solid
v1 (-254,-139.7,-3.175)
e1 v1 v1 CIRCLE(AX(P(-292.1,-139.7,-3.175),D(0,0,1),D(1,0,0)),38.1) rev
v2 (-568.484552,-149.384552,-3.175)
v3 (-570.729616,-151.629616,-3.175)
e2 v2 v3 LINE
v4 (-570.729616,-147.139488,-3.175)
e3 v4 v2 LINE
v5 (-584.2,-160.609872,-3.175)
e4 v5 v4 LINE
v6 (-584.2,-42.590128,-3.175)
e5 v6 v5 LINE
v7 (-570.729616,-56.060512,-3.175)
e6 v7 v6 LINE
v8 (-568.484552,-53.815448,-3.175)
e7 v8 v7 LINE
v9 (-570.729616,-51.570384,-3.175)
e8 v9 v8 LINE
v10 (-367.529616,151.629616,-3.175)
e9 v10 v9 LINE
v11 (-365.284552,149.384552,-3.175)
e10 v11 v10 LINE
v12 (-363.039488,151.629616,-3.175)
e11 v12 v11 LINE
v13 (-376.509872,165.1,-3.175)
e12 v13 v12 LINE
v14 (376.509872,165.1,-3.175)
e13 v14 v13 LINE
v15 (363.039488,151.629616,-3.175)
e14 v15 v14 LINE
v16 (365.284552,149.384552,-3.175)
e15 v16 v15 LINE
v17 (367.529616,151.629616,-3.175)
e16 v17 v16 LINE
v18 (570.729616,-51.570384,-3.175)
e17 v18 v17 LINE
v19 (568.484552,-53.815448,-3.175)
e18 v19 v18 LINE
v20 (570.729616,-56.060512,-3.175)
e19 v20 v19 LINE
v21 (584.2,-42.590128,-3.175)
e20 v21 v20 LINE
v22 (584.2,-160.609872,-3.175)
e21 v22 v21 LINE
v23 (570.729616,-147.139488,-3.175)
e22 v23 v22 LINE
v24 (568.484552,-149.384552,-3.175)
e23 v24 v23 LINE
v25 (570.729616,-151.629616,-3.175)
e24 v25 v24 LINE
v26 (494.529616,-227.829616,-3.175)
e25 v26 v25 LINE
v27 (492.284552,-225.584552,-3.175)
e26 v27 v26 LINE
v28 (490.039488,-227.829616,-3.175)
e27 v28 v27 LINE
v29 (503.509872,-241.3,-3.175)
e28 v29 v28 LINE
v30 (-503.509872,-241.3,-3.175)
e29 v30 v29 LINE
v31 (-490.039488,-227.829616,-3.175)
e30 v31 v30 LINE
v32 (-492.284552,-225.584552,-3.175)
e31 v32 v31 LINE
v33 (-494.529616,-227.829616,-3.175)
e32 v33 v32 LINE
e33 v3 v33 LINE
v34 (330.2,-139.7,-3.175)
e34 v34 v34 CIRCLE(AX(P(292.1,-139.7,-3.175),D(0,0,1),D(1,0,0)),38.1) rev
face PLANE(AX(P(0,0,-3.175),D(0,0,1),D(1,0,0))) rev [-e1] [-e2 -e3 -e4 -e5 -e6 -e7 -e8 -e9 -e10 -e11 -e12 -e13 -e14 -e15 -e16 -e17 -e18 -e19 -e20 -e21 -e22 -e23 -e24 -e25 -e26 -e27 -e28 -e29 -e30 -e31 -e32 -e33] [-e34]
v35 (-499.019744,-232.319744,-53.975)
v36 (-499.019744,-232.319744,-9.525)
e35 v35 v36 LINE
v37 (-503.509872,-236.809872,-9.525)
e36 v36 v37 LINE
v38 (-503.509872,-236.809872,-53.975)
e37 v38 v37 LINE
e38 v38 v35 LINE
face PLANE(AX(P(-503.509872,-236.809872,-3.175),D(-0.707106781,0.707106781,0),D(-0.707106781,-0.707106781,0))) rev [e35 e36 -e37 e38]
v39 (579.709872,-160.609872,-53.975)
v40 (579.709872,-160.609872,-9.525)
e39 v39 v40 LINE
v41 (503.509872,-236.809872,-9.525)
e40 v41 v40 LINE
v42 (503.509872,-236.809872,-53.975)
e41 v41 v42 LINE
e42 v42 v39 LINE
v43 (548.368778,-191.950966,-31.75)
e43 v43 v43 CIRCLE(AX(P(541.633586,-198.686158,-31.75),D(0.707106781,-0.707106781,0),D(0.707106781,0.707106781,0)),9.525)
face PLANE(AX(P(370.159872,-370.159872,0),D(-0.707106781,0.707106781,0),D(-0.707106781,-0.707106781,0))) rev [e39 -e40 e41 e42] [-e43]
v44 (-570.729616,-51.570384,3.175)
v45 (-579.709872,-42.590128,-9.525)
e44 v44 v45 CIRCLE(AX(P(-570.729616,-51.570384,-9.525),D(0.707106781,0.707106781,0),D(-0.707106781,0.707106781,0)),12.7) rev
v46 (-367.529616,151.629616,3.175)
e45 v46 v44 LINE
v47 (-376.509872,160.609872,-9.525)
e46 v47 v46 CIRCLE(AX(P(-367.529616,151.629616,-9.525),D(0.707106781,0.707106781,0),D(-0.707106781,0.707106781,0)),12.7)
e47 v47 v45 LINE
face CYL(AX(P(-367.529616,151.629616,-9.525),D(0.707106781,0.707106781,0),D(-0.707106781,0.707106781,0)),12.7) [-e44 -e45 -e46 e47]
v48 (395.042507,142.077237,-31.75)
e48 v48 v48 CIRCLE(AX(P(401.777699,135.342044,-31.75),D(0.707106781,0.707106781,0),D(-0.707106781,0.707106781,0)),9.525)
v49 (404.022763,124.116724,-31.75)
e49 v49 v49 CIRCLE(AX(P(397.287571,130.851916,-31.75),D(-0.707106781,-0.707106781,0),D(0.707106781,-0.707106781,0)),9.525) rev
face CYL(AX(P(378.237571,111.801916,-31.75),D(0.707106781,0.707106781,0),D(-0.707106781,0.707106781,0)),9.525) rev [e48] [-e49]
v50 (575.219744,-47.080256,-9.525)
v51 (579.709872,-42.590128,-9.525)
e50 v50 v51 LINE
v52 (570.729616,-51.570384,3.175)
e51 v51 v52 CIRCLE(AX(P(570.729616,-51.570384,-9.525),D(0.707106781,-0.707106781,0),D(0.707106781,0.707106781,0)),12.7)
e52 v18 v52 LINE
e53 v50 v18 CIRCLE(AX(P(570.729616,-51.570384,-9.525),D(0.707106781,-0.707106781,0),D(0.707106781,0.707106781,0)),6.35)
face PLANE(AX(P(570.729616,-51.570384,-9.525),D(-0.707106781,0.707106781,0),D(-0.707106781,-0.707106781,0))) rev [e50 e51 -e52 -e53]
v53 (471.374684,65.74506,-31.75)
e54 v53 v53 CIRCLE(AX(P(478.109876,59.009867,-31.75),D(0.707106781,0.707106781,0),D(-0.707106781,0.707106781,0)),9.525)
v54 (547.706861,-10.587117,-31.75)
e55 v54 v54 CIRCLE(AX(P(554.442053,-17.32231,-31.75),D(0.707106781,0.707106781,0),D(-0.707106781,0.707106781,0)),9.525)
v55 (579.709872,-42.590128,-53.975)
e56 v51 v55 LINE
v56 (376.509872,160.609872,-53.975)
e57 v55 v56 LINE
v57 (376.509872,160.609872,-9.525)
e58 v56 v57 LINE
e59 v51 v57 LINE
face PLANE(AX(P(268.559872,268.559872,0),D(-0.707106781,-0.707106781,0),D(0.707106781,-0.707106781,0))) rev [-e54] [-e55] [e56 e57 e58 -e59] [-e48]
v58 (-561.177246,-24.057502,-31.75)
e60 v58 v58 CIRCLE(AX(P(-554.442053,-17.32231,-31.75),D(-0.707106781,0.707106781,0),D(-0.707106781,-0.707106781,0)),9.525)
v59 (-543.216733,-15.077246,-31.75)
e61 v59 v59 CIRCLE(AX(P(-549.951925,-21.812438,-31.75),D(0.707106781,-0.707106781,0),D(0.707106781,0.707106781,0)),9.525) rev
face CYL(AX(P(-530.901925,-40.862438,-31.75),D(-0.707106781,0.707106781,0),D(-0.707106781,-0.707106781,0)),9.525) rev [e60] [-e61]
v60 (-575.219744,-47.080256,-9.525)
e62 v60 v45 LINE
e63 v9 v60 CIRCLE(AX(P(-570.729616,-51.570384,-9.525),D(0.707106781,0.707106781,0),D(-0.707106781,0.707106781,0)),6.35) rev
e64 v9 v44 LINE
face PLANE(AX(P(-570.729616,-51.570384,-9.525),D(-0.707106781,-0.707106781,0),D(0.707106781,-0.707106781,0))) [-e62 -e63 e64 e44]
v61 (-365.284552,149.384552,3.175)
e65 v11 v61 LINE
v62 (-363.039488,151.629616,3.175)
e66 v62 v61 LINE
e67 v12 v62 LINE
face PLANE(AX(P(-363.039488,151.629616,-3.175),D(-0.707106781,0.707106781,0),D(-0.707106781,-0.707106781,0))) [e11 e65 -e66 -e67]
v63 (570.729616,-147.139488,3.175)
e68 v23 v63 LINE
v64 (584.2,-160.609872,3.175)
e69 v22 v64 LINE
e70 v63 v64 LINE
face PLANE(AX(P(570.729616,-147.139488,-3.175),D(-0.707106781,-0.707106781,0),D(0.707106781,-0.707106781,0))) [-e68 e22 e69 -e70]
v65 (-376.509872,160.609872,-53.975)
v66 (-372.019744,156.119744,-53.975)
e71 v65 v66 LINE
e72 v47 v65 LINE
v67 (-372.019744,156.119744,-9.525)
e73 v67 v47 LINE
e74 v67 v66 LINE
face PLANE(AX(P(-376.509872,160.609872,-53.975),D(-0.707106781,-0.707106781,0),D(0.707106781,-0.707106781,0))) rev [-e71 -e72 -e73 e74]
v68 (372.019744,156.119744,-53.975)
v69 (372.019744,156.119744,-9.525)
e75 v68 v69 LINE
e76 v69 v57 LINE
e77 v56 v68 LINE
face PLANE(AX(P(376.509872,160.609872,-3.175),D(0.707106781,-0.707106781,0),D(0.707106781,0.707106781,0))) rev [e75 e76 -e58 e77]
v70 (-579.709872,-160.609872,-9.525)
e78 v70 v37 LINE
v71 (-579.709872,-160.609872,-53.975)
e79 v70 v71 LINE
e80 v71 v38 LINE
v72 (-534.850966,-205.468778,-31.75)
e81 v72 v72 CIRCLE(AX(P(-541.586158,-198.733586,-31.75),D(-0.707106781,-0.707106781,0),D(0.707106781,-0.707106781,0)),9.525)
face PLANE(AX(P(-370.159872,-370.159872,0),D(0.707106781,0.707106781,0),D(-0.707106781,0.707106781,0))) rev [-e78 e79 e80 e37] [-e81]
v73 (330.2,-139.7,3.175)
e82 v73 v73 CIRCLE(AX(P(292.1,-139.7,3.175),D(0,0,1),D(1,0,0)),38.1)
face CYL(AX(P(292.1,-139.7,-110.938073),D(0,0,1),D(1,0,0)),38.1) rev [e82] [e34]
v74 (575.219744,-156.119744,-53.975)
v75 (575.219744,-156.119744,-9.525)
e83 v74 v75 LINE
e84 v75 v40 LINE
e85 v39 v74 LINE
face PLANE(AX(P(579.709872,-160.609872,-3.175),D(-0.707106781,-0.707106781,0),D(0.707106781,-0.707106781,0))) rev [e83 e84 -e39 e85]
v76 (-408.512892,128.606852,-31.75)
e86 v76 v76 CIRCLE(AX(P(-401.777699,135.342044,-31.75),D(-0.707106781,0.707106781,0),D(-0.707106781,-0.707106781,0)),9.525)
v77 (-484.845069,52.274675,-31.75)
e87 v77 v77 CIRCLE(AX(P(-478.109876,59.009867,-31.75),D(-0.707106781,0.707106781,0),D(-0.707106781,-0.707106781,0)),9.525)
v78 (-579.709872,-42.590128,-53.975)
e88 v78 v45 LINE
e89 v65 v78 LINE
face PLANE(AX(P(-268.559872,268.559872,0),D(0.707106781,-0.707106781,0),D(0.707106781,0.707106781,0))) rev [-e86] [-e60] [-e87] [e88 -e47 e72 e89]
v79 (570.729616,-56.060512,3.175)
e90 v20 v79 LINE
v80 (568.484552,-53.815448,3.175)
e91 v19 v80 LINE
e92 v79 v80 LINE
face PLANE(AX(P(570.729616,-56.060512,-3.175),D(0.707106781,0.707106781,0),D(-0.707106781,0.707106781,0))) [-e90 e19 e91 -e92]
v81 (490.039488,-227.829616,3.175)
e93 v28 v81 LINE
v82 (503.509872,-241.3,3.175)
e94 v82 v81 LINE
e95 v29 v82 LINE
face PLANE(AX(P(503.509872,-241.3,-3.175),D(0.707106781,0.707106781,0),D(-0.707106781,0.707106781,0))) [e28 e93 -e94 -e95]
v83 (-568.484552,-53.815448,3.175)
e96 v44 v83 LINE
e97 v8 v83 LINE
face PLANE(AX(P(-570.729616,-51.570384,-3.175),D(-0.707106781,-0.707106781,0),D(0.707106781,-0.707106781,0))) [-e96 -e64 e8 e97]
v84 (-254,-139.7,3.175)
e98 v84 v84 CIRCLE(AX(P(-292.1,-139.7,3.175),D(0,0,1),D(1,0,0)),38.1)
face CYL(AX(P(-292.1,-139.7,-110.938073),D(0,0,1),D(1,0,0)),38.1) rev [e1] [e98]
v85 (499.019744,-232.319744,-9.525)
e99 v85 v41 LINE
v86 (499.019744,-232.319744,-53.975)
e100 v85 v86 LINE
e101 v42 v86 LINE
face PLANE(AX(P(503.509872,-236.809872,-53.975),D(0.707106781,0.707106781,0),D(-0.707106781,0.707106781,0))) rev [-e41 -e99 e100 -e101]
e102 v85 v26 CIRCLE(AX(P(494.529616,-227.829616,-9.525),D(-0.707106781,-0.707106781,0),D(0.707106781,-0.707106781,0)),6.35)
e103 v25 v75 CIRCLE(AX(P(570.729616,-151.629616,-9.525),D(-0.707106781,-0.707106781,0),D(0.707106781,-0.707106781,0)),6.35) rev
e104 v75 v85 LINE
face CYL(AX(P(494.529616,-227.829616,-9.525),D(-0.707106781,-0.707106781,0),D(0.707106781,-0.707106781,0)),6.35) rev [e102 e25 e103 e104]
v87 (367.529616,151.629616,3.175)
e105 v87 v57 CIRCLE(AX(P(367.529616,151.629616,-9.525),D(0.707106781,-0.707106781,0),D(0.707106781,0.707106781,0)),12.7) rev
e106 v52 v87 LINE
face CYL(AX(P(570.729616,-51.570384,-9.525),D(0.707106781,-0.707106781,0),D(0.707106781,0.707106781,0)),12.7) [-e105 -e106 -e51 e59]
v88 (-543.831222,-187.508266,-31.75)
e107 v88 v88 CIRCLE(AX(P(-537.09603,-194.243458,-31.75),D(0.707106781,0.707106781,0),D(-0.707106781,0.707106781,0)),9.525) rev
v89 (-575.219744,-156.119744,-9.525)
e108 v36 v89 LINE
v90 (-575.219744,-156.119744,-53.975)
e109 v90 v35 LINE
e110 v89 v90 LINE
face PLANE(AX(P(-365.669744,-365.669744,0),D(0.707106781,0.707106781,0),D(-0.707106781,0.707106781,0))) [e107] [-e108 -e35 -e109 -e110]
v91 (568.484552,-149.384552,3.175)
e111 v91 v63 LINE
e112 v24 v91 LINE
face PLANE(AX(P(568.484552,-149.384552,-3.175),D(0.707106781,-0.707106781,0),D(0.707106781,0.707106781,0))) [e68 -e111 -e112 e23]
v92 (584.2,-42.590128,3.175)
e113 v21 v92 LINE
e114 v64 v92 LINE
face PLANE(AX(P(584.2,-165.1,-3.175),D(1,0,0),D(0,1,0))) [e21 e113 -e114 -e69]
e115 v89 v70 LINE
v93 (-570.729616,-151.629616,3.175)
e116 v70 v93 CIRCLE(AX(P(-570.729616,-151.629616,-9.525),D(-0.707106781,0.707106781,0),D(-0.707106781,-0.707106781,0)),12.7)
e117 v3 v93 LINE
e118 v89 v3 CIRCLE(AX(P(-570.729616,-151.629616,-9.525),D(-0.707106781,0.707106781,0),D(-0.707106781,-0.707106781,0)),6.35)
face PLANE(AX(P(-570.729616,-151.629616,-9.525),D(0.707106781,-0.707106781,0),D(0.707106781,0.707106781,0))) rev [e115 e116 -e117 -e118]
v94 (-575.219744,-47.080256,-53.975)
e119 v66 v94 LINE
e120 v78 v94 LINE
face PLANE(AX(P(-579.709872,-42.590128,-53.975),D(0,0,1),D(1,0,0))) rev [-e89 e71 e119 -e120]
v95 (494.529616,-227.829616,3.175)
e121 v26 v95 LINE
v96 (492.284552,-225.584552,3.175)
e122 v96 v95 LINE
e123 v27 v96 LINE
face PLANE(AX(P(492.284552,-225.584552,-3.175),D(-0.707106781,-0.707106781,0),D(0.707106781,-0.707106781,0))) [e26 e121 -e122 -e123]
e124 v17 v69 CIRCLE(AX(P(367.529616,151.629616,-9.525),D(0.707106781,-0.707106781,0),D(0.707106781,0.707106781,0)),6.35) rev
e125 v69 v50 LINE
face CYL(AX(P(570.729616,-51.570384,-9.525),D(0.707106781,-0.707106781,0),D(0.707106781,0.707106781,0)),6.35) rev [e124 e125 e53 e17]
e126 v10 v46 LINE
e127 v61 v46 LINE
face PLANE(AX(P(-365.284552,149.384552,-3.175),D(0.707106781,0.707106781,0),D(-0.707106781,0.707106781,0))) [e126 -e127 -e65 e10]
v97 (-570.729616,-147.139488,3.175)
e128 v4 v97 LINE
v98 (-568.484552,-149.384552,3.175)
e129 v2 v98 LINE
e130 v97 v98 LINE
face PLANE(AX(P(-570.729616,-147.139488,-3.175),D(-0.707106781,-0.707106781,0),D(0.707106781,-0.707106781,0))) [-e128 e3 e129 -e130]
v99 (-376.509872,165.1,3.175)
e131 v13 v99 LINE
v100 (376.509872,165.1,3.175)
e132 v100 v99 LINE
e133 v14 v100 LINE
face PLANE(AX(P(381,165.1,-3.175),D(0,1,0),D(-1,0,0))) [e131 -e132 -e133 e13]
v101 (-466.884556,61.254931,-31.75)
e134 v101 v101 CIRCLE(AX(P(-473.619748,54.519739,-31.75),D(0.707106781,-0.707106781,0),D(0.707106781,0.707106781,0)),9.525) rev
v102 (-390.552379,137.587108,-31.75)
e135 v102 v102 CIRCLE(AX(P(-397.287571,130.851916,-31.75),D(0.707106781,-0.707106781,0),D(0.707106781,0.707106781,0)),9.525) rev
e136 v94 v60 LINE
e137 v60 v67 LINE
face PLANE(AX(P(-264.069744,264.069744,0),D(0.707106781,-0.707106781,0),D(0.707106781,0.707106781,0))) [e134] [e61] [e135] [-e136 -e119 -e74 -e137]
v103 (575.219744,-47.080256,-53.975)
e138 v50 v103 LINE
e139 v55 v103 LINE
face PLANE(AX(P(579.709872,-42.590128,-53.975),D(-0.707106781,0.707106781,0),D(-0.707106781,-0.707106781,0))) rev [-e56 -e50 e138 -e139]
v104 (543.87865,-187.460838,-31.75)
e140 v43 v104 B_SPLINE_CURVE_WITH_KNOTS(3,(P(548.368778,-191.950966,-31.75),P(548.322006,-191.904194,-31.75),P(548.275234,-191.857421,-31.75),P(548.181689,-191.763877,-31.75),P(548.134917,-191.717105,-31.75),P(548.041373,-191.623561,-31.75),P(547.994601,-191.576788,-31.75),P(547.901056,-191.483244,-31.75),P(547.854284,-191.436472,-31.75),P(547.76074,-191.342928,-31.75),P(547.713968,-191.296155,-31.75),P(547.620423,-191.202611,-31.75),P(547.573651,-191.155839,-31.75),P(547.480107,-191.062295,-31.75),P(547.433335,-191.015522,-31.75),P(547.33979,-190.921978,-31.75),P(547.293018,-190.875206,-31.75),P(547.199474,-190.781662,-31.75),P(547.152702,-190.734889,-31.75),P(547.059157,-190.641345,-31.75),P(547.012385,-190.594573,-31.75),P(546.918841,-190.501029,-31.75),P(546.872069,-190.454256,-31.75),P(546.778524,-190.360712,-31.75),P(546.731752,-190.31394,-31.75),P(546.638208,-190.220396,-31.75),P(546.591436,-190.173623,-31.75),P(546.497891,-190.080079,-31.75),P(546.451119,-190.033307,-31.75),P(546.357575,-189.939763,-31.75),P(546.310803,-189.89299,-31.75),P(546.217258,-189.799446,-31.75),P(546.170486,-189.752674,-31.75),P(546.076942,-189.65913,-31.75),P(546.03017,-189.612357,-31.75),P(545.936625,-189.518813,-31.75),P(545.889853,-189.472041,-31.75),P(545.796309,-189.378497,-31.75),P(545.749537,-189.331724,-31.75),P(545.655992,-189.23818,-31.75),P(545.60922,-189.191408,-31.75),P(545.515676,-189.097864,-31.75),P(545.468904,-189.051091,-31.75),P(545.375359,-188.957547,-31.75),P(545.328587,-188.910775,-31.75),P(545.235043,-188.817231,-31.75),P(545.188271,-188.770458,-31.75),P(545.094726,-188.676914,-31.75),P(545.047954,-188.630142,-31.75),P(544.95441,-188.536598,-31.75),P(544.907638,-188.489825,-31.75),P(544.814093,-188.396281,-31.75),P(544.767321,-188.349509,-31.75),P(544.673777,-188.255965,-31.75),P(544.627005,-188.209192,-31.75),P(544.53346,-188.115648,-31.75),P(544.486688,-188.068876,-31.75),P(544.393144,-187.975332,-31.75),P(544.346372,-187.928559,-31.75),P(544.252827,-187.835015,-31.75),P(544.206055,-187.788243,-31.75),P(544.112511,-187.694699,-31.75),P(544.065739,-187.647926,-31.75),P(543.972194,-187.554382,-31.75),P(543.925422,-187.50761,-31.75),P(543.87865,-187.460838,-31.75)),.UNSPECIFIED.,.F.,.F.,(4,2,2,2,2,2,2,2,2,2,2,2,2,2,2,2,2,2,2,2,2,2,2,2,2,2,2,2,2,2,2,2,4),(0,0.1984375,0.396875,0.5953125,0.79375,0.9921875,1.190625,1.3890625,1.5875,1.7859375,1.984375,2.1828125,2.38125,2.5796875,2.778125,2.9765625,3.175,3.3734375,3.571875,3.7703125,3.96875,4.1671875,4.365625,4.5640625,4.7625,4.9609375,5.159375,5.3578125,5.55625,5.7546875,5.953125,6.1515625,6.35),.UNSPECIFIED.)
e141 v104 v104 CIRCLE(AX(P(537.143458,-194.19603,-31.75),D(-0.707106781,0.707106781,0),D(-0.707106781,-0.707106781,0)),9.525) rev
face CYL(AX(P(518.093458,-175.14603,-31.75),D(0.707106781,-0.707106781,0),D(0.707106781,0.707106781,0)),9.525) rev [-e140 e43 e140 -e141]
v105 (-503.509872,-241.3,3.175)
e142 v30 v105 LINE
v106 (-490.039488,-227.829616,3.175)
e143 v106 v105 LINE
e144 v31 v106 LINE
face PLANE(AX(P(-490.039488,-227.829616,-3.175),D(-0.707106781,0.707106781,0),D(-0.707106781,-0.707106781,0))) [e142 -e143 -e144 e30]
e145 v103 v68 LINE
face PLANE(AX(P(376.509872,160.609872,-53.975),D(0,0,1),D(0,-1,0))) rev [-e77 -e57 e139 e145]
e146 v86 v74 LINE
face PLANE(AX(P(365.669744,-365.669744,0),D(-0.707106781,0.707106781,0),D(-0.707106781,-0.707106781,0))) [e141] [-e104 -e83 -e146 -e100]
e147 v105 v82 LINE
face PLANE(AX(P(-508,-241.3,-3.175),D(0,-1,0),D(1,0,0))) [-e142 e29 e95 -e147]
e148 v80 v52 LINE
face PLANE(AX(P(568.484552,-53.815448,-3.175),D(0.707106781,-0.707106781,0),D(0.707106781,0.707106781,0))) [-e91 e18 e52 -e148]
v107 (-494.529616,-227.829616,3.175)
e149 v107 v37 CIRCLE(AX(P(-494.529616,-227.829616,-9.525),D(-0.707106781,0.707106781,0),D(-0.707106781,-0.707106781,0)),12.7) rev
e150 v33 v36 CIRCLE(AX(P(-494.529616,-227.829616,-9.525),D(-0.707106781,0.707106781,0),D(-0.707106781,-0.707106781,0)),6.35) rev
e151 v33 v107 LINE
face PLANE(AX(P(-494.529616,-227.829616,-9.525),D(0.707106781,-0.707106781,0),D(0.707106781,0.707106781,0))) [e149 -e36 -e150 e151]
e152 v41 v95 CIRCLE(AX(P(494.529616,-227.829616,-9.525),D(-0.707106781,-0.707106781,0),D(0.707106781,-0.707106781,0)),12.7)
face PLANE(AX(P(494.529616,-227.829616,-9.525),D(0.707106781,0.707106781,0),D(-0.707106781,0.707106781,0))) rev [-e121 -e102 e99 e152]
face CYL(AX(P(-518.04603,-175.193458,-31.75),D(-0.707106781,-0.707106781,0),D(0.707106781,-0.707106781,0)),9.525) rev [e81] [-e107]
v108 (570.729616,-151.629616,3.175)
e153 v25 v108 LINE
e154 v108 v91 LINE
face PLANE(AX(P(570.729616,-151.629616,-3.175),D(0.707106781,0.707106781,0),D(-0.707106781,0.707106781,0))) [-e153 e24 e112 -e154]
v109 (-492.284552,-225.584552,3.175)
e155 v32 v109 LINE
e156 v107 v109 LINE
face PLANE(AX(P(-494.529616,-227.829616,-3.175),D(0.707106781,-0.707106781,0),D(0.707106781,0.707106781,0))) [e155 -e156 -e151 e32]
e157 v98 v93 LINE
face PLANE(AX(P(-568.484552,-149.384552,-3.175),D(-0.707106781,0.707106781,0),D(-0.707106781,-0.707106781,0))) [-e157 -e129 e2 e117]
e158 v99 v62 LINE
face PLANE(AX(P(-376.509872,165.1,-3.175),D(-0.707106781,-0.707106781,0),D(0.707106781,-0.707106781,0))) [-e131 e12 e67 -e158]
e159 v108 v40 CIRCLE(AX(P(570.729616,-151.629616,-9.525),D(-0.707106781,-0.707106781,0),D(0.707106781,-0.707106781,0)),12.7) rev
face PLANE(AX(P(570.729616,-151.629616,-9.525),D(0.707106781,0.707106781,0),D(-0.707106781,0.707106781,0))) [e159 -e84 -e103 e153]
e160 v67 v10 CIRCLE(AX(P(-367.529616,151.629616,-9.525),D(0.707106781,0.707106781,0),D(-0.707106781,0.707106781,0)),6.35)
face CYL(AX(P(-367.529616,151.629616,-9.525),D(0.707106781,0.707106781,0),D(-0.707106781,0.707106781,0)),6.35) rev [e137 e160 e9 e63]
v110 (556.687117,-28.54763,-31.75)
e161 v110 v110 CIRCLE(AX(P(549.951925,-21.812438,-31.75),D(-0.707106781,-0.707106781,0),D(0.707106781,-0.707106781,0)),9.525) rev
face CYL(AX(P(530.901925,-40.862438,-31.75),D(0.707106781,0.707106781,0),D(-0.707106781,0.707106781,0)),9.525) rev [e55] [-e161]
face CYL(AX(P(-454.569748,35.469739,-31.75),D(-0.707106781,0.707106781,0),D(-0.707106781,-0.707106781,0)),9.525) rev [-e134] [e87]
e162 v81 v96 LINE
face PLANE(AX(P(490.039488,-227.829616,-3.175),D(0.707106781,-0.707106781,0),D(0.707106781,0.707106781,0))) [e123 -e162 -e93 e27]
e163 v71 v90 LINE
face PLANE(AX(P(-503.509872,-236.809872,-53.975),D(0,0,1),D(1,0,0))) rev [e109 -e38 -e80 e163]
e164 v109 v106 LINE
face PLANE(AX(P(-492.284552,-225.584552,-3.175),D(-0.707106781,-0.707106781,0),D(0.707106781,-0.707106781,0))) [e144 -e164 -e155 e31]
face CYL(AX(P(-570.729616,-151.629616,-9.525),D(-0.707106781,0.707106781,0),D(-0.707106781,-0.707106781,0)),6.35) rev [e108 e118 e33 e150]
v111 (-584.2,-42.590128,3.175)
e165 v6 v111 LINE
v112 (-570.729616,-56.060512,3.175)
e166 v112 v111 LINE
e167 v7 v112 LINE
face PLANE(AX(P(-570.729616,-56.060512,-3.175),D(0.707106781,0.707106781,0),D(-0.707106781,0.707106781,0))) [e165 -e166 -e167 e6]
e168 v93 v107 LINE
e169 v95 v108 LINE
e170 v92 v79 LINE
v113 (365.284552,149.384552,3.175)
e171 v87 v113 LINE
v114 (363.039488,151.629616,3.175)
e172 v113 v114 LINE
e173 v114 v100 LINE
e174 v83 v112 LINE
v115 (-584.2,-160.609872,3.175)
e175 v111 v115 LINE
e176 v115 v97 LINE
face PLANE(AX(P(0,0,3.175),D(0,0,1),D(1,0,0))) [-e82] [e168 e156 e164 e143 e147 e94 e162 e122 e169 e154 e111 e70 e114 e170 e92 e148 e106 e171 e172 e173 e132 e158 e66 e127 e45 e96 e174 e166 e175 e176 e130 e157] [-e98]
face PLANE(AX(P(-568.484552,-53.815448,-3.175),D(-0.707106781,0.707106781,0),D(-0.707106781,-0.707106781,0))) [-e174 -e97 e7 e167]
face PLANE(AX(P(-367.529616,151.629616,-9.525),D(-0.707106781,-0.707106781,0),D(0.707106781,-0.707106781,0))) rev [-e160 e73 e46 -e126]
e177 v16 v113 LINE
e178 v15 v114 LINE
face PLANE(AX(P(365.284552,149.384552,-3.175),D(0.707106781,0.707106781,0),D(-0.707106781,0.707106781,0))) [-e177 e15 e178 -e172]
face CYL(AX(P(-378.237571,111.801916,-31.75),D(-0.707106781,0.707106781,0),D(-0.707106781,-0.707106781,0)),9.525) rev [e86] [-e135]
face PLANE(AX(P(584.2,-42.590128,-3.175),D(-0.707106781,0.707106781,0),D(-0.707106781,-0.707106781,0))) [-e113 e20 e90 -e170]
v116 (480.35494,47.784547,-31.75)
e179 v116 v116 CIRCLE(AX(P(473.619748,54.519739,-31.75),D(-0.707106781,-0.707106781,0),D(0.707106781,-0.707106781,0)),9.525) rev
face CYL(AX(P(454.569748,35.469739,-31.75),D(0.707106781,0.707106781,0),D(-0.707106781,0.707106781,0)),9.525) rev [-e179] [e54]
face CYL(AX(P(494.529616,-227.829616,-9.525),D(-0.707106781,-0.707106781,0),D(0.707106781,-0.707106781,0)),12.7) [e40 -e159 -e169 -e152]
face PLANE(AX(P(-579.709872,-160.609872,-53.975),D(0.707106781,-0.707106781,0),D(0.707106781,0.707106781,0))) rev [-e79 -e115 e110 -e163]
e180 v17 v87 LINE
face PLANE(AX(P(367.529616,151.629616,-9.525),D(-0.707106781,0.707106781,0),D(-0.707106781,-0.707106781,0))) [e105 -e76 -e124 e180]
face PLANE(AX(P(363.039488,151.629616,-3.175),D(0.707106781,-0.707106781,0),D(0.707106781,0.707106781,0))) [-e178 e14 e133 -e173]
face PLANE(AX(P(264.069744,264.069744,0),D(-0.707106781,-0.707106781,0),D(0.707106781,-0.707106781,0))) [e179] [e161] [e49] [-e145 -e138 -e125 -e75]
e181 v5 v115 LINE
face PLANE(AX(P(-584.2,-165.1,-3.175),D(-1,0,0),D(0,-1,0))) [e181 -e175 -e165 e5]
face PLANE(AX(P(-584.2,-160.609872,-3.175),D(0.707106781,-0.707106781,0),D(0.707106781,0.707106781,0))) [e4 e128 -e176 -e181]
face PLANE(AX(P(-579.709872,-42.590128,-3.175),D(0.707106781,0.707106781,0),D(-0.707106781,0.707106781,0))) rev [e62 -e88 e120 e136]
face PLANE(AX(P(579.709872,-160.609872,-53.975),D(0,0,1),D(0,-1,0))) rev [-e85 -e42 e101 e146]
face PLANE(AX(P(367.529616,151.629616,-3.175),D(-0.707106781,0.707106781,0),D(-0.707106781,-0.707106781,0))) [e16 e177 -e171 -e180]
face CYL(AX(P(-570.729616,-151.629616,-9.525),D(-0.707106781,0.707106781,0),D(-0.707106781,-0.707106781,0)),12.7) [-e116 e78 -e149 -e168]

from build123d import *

# Parameters (mm, degrees)
BASE_FLANGE1_START    = -3.175
BASE_FLANGE1_DEPTH    = 6.35
EDGE_FLANGE1_START    = 152.664354058
EDGE_FLANGE1_DEPTH    = 287.368195874
EDGE_FLANGE1_START_2  = -296.348451995
EDGE_FLANGE1_2_DEPTH  = 107.763073453
EDGE_FLANGE1_START_3  = -826.183563138
EDGE_FLANGE1_3_DEPTH  = 287.368195874
EDGE_FLANGE1_START_4  = -197.565634664
EDGE_FLANGE1_4_DEPTH  = 107.763073453
EDGE_FLANGE1_START_5  = 149.489354058
EDGE_FLANGE1_5_DEPTH  = 293.718195874
EDGE_FLANGE1_START_6  = -299.523451995
EDGE_FLANGE1_6_DEPTH  = 114.113073453
EDGE_FLANGE1_7_DEPTH  = 3.175
EDGE_FLANGE1_START_7  = -188.585378542
EDGE_FLANGE1_8_DEPTH  = 3.175
EDGE_FLANGE1_9_DEPTH  = 3.175
EDGE_FLANGE1_START_8  = 440.032549932
EDGE_FLANGE1_10_DEPTH = 3.175
EDGE_FLANGE1_START_9  = -829.358563138
EDGE_FLANGE1_11_DEPTH = 293.718195874
EDGE_FLANGE1_START_10 = -200.740634664
EDGE_FLANGE1_12_DEPTH = 114.113073453
EDGE_FLANGE1_13_DEPTH = 3.175
EDGE_FLANGE1_START_11 = -538.815367264
EDGE_FLANGE1_14_DEPTH = 3.175
EDGE_FLANGE1_15_DEPTH = 3.175
EDGE_FLANGE1_START_12 = -89.802561211
EDGE_FLANGE1_16_DEPTH = 3.175
SKETCH21_R            = 9.525
CUT_EXTRUDE1_DEPTH    = 6.35
SKETCH22_R            = 9.525
CUT_EXTRUDE2_DEPTH    = 6.35
SKETCH29_R            = 9.525
CUT_EXTRUDE5_DEPTH    = 6.35
SKETCH30_R            = 9.525
CUT_EXTRUDE6_DEPTH    = 6.35
SKETCH31_R            = 38.1
CUT_EXTRUDE7_DEPTH    = 6.35


# Read off the part's stored shape, not the designer's step: Base-Flange1, Edge-Flange1
with BuildPart() as part:
    # Base-Flange1 outline → Base-Flange1 (new body)
    with BuildSketch(Plane.XY.offset(BASE_FLANGE1_START)):
        Polygon((-508, -241.3), (508, -241.3), (584.2, -165.1), (584.2, -38.1), (381, 165.1), (-381, 165.1), (-584.2, -38.1), (-584.2, -165.1), align=None)
    extrude(amount=BASE_FLANGE1_DEPTH)

    # Edge-Flange1 outline → Edge-Flange1 (add)
    with BuildSketch(Plane(origin=(0, 0, 0), x_dir=(0.7071067811865474, 0.7071067811865477, 0), z_dir=(0.7071067811865476, -0.7071067811865476, 0)).offset(EDGE_FLANGE1_START)):
        with BuildLine():
            Line((378.099535834, -3.175), (367.101013206, -3.175))
            ThreePointArc((367.101013206, -3.175), (371.591141267, -5.034871939), (373.451013206, -9.525))
            Line((373.451013206, -9.525), (373.451013206, -53.975))
            Line((373.451013206, -53.975), (379.801013206, -53.975))
            Line((379.801013206, -53.975), (379.801013206, -9.525))
            ThreePointArc((379.801013206, -9.525), (379.3682712, -6.237998127), (378.099535834, -3.175))
        make_face()
    extrude(amount=EDGE_FLANGE1_DEPTH)

    # Edge-Flange1 2 outline → Edge-Flange1 2 (add)
    with BuildSketch(Plane(origin=(0, 0, 0), x_dir=(0.7071067811865474, 0.7071067811865477, 0), z_dir=(0.7071067811865476, -0.7071067811865476, 0)).offset(EDGE_FLANGE1_START_2)):
        with BuildLine():
            ThreePointArc((-517.135111143, -9.525), (-515.275239204, -5.034871939), (-510.785111143, -3.175))
            Line((-510.785111143, -3.175), (-521.783633771, -3.175))
            ThreePointArc((-521.783633771, -3.175), (-523.052369137, -6.237998127), (-523.485111143, -9.525))
            Line((-523.485111143, -9.525), (-523.485111143, -53.975))
            Line((-523.485111143, -53.975), (-517.135111143, -53.975))
            Line((-517.135111143, -53.975), (-517.135111143, -9.525))
        make_face()
    extrude(amount=EDGE_FLANGE1_2_DEPTH)

    # Edge-Flange1 3 outline → Edge-Flange1 3 (add)
    with BuildSketch(Plane(origin=(273.05, 273.05, -3.175), x_dir=(0.7071067811865481, -0.7071067811865469, 0), z_dir=(0.7071067811865469, 0.7071067811865481, 3.4914813388431334e-15)).offset(EDGE_FLANGE1_START_3)):
        with BuildLine():
            Line((-378.099535834, 0), (-367.101013206, 0))
            ThreePointArc((-367.101013206, 0), (-371.591141267, 1.859871939), (-373.451013206, 6.35))
            Line((-373.451013206, 6.35), (-373.451013206, 50.8))
            Line((-373.451013206, 50.8), (-379.801013206, 50.8))
            Line((-379.801013206, 50.8), (-379.801013206, 6.35))
            ThreePointArc((-379.801013206, 6.35), (-379.3682712, 3.062998127), (-378.099535834, 0))
        make_face()
    extrude(amount=EDGE_FLANGE1_3_DEPTH)

    # Edge-Flange1 4 outline → Edge-Flange1 4 (add)
    with BuildSketch(Plane(origin=(273.05, 273.05, -3.175), x_dir=(0.7071067811865481, -0.7071067811865469, 0), z_dir=(0.7071067811865469, 0.7071067811865481, 3.4914813388431334e-15)).offset(EDGE_FLANGE1_START_4)):
        with BuildLine():
            ThreePointArc((517.135111143, 6.35), (515.275239204, 1.859871939), (510.785111143, 0))
            Line((510.785111143, 0), (521.783633771, 0))
            ThreePointArc((521.783633771, 0), (523.052369137, 3.062998127), (523.485111143, 6.35))
            Line((523.485111143, 6.35), (523.485111143, 50.8))
            Line((523.485111143, 50.8), (517.135111143, 50.8))
            Line((517.135111143, 50.8), (517.135111143, 6.35))
        make_face()
    extrude(amount=EDGE_FLANGE1_4_DEPTH)

    # Edge-Flange1 5 outline → Edge-Flange1 5 (cut)
    with BuildSketch(Plane(origin=(0, 0, 0), x_dir=(0.7071067811865474, 0.7071067811865477, 0), z_dir=(0.7071067811865476, -0.7071067811865476, 0)).offset(EDGE_FLANGE1_START_5)):
        with BuildLine():
            Line((386.151013206, 3.175), (367.101013206, 3.175))
            ThreePointArc((367.101013206, 3.175), (373.451013206, 1.473522628), (378.099535834, -3.175))
            Line((378.099535834, -3.175), (386.151013206, -3.175))
            Line((386.151013206, -3.175), (386.151013206, 3.175))
        make_face()
    extrude(amount=EDGE_FLANGE1_5_DEPTH, mode=Mode.SUBTRACT)

    # Edge-Flange1 6 outline → Edge-Flange1 6 (cut)
    with BuildSketch(Plane(origin=(0, 0, 0), x_dir=(0.7071067811865474, 0.7071067811865477, 0), z_dir=(0.7071067811865476, -0.7071067811865476, 0)).offset(EDGE_FLANGE1_START_6)):
        with BuildLine():
            ThreePointArc((-521.783633771, -3.175), (-517.135111143, 1.473522628), (-510.785111143, 3.175))
            Line((-510.785111143, 3.175), (-529.835111143, 3.175))
            Line((-529.835111143, 3.175), (-529.835111143, -3.175))
            Line((-529.835111143, -3.175), (-521.783633771, -3.175))
        make_face()
    extrude(amount=EDGE_FLANGE1_6_DEPTH, mode=Mode.SUBTRACT)

    # Edge-Flange1 7 outline → Edge-Flange1 7 (cut)
    with BuildSketch(Plane(origin=(0, 0, 0), x_dir=(0.7071067811865474, 0.7071067811865477, 0), z_dir=(0.7071067811865476, -0.7071067811865476, 0)).offset(EDGE_FLANGE1_START_6)):
        with BuildLine():
            Line((-521.783633771, -3.175), (-507.610111143, -3.175))
            Line((-507.610111143, -3.175), (-507.610111143, 3.175))
            Line((-507.610111143, 3.175), (-510.785111143, 3.175))
            ThreePointArc((-510.785111143, 3.175), (-517.135111143, 1.473522628), (-521.783633771, -3.175))
        make_face()
    extrude(amount=EDGE_FLANGE1_7_DEPTH, mode=Mode.SUBTRACT)

    # Edge-Flange1 8 outline → Edge-Flange1 8 (cut)
    with BuildSketch(Plane(origin=(0, 0, 0), x_dir=(0.7071067811865474, 0.7071067811865477, 0), z_dir=(0.7071067811865476, -0.7071067811865476, 0)).offset(EDGE_FLANGE1_START_7)):
        with BuildLine():
            Line((-521.783633771, -3.175), (-507.610111143, -3.175))
            Line((-507.610111143, -3.175), (-507.610111143, 3.175))
            Line((-507.610111143, 3.175), (-510.785111143, 3.175))
            ThreePointArc((-510.785111143, 3.175), (-517.135111143, 1.473522628), (-521.783633771, -3.175))
        make_face()
    extrude(amount=EDGE_FLANGE1_8_DEPTH, mode=Mode.SUBTRACT)

    # Edge-Flange1 9 outline → Edge-Flange1 9 (cut)
    with BuildSketch(Plane(origin=(0, 0, 0), x_dir=(0.7071067811865474, 0.7071067811865477, 0), z_dir=(0.7071067811865476, -0.7071067811865476, 0)).offset(EDGE_FLANGE1_START_5)):
        with BuildLine():
            Line((363.926013206, 3.175), (363.926013206, -3.175))
            Line((363.926013206, -3.175), (378.099535834, -3.175))
            ThreePointArc((378.099535834, -3.175), (373.451013206, 1.473522628), (367.101013206, 3.175))
            Line((367.101013206, 3.175), (363.926013206, 3.175))
        make_face()
    extrude(amount=EDGE_FLANGE1_9_DEPTH, mode=Mode.SUBTRACT)

    # Edge-Flange1 10 outline → Edge-Flange1 10 (cut)
    with BuildSketch(Plane(origin=(0, 0, 0), x_dir=(0.7071067811865474, 0.7071067811865477, 0), z_dir=(0.7071067811865476, -0.7071067811865476, 0)).offset(EDGE_FLANGE1_START_8)):
        with BuildLine():
            Line((363.926013206, 3.175), (363.926013206, -3.175))
            Line((363.926013206, -3.175), (378.099535834, -3.175))
            ThreePointArc((378.099535834, -3.175), (373.451013206, 1.473522628), (367.101013206, 3.175))
            Line((367.101013206, 3.175), (363.926013206, 3.175))
        make_face()
    extrude(amount=EDGE_FLANGE1_10_DEPTH, mode=Mode.SUBTRACT)

    # Edge-Flange1 11 outline → Edge-Flange1 11 (cut)
    with BuildSketch(Plane(origin=(273.05, 273.05, -3.175), x_dir=(0.7071067811865481, -0.7071067811865469, 0), z_dir=(0.7071067811865469, 0.7071067811865481, 3.4914813388431334e-15)).offset(EDGE_FLANGE1_START_9)):
        with BuildLine():
            Line((-386.151013206, -6.35), (-367.101013206, -6.35))
            ThreePointArc((-367.101013206, -6.35), (-373.451013206, -4.648522628), (-378.099535834, 0))
            Line((-378.099535834, 0), (-386.151013206, 0))
            Line((-386.151013206, 0), (-386.151013206, -6.35))
        make_face()
    extrude(amount=EDGE_FLANGE1_11_DEPTH, mode=Mode.SUBTRACT)

    # Edge-Flange1 12 outline → Edge-Flange1 12 (cut)
    with BuildSketch(Plane(origin=(273.05, 273.05, -3.175), x_dir=(0.7071067811865481, -0.7071067811865469, 0), z_dir=(0.7071067811865469, 0.7071067811865481, 3.4914813388431334e-15)).offset(EDGE_FLANGE1_START_10)):
        with BuildLine():
            ThreePointArc((521.783633771, 0), (517.135111143, -4.648522628), (510.785111143, -6.35))
            Line((510.785111143, -6.35), (529.835111143, -6.35))
            Line((529.835111143, -6.35), (529.835111143, 0))
            Line((529.835111143, 0), (521.783633771, 0))
        make_face()
    extrude(amount=EDGE_FLANGE1_12_DEPTH, mode=Mode.SUBTRACT)

    # Edge-Flange1 13 outline → Edge-Flange1 13 (cut)
    with BuildSketch(Plane(origin=(273.05, 273.05, -3.175), x_dir=(0.7071067811865481, -0.7071067811865469, 0), z_dir=(0.7071067811865469, 0.7071067811865481, 3.4914813388431334e-15)).offset(EDGE_FLANGE1_START_9)):
        with BuildLine():
            Line((-363.926013206, -6.35), (-363.926013206, 0))
            Line((-363.926013206, 0), (-378.099535834, 0))
            ThreePointArc((-378.099535834, 0), (-373.451013206, -4.648522628), (-367.101013206, -6.35))
            Line((-367.101013206, -6.35), (-363.926013206, -6.35))
        make_face()
    extrude(amount=EDGE_FLANGE1_13_DEPTH, mode=Mode.SUBTRACT)

    # Edge-Flange1 14 outline → Edge-Flange1 14 (cut)
    with BuildSketch(Plane(origin=(273.05, 273.05, -3.175), x_dir=(0.7071067811865481, -0.7071067811865469, 0), z_dir=(0.7071067811865469, 0.7071067811865481, 3.4914813388431334e-15)).offset(EDGE_FLANGE1_START_11)):
        with BuildLine():
            Line((-363.926013206, -6.35), (-363.926013206, 0))
            Line((-363.926013206, 0), (-378.099535834, 0))
            ThreePointArc((-378.099535834, 0), (-373.451013206, -4.648522628), (-367.101013206, -6.35))
            Line((-367.101013206, -6.35), (-363.926013206, -6.35))
        make_face()
    extrude(amount=EDGE_FLANGE1_14_DEPTH, mode=Mode.SUBTRACT)

    # Edge-Flange1 15 outline → Edge-Flange1 15 (cut)
    with BuildSketch(Plane(origin=(273.05, 273.05, -3.175), x_dir=(0.7071067811865481, -0.7071067811865469, 0), z_dir=(0.7071067811865469, 0.7071067811865481, 3.4914813388431334e-15)).offset(EDGE_FLANGE1_START_10)):
        with BuildLine():
            Line((521.783633771, 0), (507.610111143, 0))
            Line((507.610111143, 0), (507.610111143, -6.35))
            Line((507.610111143, -6.35), (510.785111143, -6.35))
            ThreePointArc((510.785111143, -6.35), (517.135111143, -4.648522628), (521.783633771, 0))
        make_face()
    extrude(amount=EDGE_FLANGE1_15_DEPTH, mode=Mode.SUBTRACT)

    # Edge-Flange1 16 outline → Edge-Flange1 16 (cut)
    with BuildSketch(Plane(origin=(273.05, 273.05, -3.175), x_dir=(0.7071067811865481, -0.7071067811865469, 0), z_dir=(0.7071067811865469, 0.7071067811865481, 3.4914813388431334e-15)).offset(EDGE_FLANGE1_START_12)):
        with BuildLine():
            Line((521.783633771, 0), (507.610111143, 0))
            Line((507.610111143, 0), (507.610111143, -6.35))
            Line((507.610111143, -6.35), (510.785111143, -6.35))
            ThreePointArc((510.785111143, -6.35), (517.135111143, -4.648522628), (521.783633771, 0))
        make_face()
    extrude(amount=EDGE_FLANGE1_16_DEPTH, mode=Mode.SUBTRACT)

    # Sketch21 → Cut-Extrude1 (cut)
    with BuildSketch(Plane(origin=(268.559871939, 268.559871939, 0), x_dir=(0, 0, -1), z_dir=(0.7071067811865468, 0.7071067811865483, 1.5453665931926906e-15))):
        with Locations(Location((31.75, -188.398458358, 0), (0, 0, 90))):
            Circle(SKETCH21_R)
        with Locations(Location((31.75, -296.348458358, 0), (0, 0, 90))):
            Circle(SKETCH21_R)
        with Locations(Location((31.75, -404.298458358, 0), (0, 0, 90))):
            Circle(SKETCH21_R)
    extrude(amount=-CUT_EXTRUDE1_DEPTH, mode=Mode.SUBTRACT)

    # Sketch22 → Cut-Extrude2 (cut)
    with BuildSketch(Plane(origin=(-268.559871939, 268.559871939, 0), x_dir=(0, 0, 1), z_dir=(-0.707106781186548, 0.7071067811865471, 4.2497581312798994e-15))):
        with Locations(Location((-31.75, -188.398458358, 0), (0, 0, 270))):
            Circle(SKETCH22_R)
        with Locations(Location((-31.75, -296.348458358, 0), (0, 0, 270))):
            Circle(SKETCH22_R)
        with Locations(Location((-31.75, -404.298458358, 0), (0, 0, 270))):
            Circle(SKETCH22_R)
    extrude(amount=-CUT_EXTRUDE2_DEPTH, mode=Mode.SUBTRACT)

    # Sketch29 → Cut-Extrude5 (cut)
    with BuildSketch(Plane(origin=(370.159871939, -370.159871939, 0), x_dir=(0, 0, -1), z_dir=(0.7071067811865457, -0.7071067811865493, 4.2497581312799065e-15))):
        with Locations(Location((31.75, 242.500451995, 0), (0, 0, 90))):
            Circle(SKETCH29_R)
    extrude(amount=-CUT_EXTRUDE5_DEPTH, mode=Mode.SUBTRACT)

    # Sketch30 → Cut-Extrude6 (cut)
    with BuildSketch(Plane(origin=(-370.159871939, -370.159871939, 0), x_dir=(0, 0, 1), z_dir=(-0.7071067811865476, -0.7071067811865476, 3.0907331863853848e-15))):
        with Locations(Location((-31.75, 242.433378542, 0), (0, 0, 270))):
            Circle(SKETCH30_R)
    extrude(amount=-CUT_EXTRUDE6_DEPTH, mode=Mode.SUBTRACT)

    # Sketch31 → Cut-Extrude7 (cut)
    with BuildSketch(Plane.XY.offset(3.175)):
        with Locations((-292.1, -139.7)):
            Circle(SKETCH31_R)
        with Locations((292.1, -139.7)):
            Circle(SKETCH31_R)
    extrude(amount=-CUT_EXTRUDE7_DEPTH, mode=Mode.SUBTRACT)


solid = part.part
